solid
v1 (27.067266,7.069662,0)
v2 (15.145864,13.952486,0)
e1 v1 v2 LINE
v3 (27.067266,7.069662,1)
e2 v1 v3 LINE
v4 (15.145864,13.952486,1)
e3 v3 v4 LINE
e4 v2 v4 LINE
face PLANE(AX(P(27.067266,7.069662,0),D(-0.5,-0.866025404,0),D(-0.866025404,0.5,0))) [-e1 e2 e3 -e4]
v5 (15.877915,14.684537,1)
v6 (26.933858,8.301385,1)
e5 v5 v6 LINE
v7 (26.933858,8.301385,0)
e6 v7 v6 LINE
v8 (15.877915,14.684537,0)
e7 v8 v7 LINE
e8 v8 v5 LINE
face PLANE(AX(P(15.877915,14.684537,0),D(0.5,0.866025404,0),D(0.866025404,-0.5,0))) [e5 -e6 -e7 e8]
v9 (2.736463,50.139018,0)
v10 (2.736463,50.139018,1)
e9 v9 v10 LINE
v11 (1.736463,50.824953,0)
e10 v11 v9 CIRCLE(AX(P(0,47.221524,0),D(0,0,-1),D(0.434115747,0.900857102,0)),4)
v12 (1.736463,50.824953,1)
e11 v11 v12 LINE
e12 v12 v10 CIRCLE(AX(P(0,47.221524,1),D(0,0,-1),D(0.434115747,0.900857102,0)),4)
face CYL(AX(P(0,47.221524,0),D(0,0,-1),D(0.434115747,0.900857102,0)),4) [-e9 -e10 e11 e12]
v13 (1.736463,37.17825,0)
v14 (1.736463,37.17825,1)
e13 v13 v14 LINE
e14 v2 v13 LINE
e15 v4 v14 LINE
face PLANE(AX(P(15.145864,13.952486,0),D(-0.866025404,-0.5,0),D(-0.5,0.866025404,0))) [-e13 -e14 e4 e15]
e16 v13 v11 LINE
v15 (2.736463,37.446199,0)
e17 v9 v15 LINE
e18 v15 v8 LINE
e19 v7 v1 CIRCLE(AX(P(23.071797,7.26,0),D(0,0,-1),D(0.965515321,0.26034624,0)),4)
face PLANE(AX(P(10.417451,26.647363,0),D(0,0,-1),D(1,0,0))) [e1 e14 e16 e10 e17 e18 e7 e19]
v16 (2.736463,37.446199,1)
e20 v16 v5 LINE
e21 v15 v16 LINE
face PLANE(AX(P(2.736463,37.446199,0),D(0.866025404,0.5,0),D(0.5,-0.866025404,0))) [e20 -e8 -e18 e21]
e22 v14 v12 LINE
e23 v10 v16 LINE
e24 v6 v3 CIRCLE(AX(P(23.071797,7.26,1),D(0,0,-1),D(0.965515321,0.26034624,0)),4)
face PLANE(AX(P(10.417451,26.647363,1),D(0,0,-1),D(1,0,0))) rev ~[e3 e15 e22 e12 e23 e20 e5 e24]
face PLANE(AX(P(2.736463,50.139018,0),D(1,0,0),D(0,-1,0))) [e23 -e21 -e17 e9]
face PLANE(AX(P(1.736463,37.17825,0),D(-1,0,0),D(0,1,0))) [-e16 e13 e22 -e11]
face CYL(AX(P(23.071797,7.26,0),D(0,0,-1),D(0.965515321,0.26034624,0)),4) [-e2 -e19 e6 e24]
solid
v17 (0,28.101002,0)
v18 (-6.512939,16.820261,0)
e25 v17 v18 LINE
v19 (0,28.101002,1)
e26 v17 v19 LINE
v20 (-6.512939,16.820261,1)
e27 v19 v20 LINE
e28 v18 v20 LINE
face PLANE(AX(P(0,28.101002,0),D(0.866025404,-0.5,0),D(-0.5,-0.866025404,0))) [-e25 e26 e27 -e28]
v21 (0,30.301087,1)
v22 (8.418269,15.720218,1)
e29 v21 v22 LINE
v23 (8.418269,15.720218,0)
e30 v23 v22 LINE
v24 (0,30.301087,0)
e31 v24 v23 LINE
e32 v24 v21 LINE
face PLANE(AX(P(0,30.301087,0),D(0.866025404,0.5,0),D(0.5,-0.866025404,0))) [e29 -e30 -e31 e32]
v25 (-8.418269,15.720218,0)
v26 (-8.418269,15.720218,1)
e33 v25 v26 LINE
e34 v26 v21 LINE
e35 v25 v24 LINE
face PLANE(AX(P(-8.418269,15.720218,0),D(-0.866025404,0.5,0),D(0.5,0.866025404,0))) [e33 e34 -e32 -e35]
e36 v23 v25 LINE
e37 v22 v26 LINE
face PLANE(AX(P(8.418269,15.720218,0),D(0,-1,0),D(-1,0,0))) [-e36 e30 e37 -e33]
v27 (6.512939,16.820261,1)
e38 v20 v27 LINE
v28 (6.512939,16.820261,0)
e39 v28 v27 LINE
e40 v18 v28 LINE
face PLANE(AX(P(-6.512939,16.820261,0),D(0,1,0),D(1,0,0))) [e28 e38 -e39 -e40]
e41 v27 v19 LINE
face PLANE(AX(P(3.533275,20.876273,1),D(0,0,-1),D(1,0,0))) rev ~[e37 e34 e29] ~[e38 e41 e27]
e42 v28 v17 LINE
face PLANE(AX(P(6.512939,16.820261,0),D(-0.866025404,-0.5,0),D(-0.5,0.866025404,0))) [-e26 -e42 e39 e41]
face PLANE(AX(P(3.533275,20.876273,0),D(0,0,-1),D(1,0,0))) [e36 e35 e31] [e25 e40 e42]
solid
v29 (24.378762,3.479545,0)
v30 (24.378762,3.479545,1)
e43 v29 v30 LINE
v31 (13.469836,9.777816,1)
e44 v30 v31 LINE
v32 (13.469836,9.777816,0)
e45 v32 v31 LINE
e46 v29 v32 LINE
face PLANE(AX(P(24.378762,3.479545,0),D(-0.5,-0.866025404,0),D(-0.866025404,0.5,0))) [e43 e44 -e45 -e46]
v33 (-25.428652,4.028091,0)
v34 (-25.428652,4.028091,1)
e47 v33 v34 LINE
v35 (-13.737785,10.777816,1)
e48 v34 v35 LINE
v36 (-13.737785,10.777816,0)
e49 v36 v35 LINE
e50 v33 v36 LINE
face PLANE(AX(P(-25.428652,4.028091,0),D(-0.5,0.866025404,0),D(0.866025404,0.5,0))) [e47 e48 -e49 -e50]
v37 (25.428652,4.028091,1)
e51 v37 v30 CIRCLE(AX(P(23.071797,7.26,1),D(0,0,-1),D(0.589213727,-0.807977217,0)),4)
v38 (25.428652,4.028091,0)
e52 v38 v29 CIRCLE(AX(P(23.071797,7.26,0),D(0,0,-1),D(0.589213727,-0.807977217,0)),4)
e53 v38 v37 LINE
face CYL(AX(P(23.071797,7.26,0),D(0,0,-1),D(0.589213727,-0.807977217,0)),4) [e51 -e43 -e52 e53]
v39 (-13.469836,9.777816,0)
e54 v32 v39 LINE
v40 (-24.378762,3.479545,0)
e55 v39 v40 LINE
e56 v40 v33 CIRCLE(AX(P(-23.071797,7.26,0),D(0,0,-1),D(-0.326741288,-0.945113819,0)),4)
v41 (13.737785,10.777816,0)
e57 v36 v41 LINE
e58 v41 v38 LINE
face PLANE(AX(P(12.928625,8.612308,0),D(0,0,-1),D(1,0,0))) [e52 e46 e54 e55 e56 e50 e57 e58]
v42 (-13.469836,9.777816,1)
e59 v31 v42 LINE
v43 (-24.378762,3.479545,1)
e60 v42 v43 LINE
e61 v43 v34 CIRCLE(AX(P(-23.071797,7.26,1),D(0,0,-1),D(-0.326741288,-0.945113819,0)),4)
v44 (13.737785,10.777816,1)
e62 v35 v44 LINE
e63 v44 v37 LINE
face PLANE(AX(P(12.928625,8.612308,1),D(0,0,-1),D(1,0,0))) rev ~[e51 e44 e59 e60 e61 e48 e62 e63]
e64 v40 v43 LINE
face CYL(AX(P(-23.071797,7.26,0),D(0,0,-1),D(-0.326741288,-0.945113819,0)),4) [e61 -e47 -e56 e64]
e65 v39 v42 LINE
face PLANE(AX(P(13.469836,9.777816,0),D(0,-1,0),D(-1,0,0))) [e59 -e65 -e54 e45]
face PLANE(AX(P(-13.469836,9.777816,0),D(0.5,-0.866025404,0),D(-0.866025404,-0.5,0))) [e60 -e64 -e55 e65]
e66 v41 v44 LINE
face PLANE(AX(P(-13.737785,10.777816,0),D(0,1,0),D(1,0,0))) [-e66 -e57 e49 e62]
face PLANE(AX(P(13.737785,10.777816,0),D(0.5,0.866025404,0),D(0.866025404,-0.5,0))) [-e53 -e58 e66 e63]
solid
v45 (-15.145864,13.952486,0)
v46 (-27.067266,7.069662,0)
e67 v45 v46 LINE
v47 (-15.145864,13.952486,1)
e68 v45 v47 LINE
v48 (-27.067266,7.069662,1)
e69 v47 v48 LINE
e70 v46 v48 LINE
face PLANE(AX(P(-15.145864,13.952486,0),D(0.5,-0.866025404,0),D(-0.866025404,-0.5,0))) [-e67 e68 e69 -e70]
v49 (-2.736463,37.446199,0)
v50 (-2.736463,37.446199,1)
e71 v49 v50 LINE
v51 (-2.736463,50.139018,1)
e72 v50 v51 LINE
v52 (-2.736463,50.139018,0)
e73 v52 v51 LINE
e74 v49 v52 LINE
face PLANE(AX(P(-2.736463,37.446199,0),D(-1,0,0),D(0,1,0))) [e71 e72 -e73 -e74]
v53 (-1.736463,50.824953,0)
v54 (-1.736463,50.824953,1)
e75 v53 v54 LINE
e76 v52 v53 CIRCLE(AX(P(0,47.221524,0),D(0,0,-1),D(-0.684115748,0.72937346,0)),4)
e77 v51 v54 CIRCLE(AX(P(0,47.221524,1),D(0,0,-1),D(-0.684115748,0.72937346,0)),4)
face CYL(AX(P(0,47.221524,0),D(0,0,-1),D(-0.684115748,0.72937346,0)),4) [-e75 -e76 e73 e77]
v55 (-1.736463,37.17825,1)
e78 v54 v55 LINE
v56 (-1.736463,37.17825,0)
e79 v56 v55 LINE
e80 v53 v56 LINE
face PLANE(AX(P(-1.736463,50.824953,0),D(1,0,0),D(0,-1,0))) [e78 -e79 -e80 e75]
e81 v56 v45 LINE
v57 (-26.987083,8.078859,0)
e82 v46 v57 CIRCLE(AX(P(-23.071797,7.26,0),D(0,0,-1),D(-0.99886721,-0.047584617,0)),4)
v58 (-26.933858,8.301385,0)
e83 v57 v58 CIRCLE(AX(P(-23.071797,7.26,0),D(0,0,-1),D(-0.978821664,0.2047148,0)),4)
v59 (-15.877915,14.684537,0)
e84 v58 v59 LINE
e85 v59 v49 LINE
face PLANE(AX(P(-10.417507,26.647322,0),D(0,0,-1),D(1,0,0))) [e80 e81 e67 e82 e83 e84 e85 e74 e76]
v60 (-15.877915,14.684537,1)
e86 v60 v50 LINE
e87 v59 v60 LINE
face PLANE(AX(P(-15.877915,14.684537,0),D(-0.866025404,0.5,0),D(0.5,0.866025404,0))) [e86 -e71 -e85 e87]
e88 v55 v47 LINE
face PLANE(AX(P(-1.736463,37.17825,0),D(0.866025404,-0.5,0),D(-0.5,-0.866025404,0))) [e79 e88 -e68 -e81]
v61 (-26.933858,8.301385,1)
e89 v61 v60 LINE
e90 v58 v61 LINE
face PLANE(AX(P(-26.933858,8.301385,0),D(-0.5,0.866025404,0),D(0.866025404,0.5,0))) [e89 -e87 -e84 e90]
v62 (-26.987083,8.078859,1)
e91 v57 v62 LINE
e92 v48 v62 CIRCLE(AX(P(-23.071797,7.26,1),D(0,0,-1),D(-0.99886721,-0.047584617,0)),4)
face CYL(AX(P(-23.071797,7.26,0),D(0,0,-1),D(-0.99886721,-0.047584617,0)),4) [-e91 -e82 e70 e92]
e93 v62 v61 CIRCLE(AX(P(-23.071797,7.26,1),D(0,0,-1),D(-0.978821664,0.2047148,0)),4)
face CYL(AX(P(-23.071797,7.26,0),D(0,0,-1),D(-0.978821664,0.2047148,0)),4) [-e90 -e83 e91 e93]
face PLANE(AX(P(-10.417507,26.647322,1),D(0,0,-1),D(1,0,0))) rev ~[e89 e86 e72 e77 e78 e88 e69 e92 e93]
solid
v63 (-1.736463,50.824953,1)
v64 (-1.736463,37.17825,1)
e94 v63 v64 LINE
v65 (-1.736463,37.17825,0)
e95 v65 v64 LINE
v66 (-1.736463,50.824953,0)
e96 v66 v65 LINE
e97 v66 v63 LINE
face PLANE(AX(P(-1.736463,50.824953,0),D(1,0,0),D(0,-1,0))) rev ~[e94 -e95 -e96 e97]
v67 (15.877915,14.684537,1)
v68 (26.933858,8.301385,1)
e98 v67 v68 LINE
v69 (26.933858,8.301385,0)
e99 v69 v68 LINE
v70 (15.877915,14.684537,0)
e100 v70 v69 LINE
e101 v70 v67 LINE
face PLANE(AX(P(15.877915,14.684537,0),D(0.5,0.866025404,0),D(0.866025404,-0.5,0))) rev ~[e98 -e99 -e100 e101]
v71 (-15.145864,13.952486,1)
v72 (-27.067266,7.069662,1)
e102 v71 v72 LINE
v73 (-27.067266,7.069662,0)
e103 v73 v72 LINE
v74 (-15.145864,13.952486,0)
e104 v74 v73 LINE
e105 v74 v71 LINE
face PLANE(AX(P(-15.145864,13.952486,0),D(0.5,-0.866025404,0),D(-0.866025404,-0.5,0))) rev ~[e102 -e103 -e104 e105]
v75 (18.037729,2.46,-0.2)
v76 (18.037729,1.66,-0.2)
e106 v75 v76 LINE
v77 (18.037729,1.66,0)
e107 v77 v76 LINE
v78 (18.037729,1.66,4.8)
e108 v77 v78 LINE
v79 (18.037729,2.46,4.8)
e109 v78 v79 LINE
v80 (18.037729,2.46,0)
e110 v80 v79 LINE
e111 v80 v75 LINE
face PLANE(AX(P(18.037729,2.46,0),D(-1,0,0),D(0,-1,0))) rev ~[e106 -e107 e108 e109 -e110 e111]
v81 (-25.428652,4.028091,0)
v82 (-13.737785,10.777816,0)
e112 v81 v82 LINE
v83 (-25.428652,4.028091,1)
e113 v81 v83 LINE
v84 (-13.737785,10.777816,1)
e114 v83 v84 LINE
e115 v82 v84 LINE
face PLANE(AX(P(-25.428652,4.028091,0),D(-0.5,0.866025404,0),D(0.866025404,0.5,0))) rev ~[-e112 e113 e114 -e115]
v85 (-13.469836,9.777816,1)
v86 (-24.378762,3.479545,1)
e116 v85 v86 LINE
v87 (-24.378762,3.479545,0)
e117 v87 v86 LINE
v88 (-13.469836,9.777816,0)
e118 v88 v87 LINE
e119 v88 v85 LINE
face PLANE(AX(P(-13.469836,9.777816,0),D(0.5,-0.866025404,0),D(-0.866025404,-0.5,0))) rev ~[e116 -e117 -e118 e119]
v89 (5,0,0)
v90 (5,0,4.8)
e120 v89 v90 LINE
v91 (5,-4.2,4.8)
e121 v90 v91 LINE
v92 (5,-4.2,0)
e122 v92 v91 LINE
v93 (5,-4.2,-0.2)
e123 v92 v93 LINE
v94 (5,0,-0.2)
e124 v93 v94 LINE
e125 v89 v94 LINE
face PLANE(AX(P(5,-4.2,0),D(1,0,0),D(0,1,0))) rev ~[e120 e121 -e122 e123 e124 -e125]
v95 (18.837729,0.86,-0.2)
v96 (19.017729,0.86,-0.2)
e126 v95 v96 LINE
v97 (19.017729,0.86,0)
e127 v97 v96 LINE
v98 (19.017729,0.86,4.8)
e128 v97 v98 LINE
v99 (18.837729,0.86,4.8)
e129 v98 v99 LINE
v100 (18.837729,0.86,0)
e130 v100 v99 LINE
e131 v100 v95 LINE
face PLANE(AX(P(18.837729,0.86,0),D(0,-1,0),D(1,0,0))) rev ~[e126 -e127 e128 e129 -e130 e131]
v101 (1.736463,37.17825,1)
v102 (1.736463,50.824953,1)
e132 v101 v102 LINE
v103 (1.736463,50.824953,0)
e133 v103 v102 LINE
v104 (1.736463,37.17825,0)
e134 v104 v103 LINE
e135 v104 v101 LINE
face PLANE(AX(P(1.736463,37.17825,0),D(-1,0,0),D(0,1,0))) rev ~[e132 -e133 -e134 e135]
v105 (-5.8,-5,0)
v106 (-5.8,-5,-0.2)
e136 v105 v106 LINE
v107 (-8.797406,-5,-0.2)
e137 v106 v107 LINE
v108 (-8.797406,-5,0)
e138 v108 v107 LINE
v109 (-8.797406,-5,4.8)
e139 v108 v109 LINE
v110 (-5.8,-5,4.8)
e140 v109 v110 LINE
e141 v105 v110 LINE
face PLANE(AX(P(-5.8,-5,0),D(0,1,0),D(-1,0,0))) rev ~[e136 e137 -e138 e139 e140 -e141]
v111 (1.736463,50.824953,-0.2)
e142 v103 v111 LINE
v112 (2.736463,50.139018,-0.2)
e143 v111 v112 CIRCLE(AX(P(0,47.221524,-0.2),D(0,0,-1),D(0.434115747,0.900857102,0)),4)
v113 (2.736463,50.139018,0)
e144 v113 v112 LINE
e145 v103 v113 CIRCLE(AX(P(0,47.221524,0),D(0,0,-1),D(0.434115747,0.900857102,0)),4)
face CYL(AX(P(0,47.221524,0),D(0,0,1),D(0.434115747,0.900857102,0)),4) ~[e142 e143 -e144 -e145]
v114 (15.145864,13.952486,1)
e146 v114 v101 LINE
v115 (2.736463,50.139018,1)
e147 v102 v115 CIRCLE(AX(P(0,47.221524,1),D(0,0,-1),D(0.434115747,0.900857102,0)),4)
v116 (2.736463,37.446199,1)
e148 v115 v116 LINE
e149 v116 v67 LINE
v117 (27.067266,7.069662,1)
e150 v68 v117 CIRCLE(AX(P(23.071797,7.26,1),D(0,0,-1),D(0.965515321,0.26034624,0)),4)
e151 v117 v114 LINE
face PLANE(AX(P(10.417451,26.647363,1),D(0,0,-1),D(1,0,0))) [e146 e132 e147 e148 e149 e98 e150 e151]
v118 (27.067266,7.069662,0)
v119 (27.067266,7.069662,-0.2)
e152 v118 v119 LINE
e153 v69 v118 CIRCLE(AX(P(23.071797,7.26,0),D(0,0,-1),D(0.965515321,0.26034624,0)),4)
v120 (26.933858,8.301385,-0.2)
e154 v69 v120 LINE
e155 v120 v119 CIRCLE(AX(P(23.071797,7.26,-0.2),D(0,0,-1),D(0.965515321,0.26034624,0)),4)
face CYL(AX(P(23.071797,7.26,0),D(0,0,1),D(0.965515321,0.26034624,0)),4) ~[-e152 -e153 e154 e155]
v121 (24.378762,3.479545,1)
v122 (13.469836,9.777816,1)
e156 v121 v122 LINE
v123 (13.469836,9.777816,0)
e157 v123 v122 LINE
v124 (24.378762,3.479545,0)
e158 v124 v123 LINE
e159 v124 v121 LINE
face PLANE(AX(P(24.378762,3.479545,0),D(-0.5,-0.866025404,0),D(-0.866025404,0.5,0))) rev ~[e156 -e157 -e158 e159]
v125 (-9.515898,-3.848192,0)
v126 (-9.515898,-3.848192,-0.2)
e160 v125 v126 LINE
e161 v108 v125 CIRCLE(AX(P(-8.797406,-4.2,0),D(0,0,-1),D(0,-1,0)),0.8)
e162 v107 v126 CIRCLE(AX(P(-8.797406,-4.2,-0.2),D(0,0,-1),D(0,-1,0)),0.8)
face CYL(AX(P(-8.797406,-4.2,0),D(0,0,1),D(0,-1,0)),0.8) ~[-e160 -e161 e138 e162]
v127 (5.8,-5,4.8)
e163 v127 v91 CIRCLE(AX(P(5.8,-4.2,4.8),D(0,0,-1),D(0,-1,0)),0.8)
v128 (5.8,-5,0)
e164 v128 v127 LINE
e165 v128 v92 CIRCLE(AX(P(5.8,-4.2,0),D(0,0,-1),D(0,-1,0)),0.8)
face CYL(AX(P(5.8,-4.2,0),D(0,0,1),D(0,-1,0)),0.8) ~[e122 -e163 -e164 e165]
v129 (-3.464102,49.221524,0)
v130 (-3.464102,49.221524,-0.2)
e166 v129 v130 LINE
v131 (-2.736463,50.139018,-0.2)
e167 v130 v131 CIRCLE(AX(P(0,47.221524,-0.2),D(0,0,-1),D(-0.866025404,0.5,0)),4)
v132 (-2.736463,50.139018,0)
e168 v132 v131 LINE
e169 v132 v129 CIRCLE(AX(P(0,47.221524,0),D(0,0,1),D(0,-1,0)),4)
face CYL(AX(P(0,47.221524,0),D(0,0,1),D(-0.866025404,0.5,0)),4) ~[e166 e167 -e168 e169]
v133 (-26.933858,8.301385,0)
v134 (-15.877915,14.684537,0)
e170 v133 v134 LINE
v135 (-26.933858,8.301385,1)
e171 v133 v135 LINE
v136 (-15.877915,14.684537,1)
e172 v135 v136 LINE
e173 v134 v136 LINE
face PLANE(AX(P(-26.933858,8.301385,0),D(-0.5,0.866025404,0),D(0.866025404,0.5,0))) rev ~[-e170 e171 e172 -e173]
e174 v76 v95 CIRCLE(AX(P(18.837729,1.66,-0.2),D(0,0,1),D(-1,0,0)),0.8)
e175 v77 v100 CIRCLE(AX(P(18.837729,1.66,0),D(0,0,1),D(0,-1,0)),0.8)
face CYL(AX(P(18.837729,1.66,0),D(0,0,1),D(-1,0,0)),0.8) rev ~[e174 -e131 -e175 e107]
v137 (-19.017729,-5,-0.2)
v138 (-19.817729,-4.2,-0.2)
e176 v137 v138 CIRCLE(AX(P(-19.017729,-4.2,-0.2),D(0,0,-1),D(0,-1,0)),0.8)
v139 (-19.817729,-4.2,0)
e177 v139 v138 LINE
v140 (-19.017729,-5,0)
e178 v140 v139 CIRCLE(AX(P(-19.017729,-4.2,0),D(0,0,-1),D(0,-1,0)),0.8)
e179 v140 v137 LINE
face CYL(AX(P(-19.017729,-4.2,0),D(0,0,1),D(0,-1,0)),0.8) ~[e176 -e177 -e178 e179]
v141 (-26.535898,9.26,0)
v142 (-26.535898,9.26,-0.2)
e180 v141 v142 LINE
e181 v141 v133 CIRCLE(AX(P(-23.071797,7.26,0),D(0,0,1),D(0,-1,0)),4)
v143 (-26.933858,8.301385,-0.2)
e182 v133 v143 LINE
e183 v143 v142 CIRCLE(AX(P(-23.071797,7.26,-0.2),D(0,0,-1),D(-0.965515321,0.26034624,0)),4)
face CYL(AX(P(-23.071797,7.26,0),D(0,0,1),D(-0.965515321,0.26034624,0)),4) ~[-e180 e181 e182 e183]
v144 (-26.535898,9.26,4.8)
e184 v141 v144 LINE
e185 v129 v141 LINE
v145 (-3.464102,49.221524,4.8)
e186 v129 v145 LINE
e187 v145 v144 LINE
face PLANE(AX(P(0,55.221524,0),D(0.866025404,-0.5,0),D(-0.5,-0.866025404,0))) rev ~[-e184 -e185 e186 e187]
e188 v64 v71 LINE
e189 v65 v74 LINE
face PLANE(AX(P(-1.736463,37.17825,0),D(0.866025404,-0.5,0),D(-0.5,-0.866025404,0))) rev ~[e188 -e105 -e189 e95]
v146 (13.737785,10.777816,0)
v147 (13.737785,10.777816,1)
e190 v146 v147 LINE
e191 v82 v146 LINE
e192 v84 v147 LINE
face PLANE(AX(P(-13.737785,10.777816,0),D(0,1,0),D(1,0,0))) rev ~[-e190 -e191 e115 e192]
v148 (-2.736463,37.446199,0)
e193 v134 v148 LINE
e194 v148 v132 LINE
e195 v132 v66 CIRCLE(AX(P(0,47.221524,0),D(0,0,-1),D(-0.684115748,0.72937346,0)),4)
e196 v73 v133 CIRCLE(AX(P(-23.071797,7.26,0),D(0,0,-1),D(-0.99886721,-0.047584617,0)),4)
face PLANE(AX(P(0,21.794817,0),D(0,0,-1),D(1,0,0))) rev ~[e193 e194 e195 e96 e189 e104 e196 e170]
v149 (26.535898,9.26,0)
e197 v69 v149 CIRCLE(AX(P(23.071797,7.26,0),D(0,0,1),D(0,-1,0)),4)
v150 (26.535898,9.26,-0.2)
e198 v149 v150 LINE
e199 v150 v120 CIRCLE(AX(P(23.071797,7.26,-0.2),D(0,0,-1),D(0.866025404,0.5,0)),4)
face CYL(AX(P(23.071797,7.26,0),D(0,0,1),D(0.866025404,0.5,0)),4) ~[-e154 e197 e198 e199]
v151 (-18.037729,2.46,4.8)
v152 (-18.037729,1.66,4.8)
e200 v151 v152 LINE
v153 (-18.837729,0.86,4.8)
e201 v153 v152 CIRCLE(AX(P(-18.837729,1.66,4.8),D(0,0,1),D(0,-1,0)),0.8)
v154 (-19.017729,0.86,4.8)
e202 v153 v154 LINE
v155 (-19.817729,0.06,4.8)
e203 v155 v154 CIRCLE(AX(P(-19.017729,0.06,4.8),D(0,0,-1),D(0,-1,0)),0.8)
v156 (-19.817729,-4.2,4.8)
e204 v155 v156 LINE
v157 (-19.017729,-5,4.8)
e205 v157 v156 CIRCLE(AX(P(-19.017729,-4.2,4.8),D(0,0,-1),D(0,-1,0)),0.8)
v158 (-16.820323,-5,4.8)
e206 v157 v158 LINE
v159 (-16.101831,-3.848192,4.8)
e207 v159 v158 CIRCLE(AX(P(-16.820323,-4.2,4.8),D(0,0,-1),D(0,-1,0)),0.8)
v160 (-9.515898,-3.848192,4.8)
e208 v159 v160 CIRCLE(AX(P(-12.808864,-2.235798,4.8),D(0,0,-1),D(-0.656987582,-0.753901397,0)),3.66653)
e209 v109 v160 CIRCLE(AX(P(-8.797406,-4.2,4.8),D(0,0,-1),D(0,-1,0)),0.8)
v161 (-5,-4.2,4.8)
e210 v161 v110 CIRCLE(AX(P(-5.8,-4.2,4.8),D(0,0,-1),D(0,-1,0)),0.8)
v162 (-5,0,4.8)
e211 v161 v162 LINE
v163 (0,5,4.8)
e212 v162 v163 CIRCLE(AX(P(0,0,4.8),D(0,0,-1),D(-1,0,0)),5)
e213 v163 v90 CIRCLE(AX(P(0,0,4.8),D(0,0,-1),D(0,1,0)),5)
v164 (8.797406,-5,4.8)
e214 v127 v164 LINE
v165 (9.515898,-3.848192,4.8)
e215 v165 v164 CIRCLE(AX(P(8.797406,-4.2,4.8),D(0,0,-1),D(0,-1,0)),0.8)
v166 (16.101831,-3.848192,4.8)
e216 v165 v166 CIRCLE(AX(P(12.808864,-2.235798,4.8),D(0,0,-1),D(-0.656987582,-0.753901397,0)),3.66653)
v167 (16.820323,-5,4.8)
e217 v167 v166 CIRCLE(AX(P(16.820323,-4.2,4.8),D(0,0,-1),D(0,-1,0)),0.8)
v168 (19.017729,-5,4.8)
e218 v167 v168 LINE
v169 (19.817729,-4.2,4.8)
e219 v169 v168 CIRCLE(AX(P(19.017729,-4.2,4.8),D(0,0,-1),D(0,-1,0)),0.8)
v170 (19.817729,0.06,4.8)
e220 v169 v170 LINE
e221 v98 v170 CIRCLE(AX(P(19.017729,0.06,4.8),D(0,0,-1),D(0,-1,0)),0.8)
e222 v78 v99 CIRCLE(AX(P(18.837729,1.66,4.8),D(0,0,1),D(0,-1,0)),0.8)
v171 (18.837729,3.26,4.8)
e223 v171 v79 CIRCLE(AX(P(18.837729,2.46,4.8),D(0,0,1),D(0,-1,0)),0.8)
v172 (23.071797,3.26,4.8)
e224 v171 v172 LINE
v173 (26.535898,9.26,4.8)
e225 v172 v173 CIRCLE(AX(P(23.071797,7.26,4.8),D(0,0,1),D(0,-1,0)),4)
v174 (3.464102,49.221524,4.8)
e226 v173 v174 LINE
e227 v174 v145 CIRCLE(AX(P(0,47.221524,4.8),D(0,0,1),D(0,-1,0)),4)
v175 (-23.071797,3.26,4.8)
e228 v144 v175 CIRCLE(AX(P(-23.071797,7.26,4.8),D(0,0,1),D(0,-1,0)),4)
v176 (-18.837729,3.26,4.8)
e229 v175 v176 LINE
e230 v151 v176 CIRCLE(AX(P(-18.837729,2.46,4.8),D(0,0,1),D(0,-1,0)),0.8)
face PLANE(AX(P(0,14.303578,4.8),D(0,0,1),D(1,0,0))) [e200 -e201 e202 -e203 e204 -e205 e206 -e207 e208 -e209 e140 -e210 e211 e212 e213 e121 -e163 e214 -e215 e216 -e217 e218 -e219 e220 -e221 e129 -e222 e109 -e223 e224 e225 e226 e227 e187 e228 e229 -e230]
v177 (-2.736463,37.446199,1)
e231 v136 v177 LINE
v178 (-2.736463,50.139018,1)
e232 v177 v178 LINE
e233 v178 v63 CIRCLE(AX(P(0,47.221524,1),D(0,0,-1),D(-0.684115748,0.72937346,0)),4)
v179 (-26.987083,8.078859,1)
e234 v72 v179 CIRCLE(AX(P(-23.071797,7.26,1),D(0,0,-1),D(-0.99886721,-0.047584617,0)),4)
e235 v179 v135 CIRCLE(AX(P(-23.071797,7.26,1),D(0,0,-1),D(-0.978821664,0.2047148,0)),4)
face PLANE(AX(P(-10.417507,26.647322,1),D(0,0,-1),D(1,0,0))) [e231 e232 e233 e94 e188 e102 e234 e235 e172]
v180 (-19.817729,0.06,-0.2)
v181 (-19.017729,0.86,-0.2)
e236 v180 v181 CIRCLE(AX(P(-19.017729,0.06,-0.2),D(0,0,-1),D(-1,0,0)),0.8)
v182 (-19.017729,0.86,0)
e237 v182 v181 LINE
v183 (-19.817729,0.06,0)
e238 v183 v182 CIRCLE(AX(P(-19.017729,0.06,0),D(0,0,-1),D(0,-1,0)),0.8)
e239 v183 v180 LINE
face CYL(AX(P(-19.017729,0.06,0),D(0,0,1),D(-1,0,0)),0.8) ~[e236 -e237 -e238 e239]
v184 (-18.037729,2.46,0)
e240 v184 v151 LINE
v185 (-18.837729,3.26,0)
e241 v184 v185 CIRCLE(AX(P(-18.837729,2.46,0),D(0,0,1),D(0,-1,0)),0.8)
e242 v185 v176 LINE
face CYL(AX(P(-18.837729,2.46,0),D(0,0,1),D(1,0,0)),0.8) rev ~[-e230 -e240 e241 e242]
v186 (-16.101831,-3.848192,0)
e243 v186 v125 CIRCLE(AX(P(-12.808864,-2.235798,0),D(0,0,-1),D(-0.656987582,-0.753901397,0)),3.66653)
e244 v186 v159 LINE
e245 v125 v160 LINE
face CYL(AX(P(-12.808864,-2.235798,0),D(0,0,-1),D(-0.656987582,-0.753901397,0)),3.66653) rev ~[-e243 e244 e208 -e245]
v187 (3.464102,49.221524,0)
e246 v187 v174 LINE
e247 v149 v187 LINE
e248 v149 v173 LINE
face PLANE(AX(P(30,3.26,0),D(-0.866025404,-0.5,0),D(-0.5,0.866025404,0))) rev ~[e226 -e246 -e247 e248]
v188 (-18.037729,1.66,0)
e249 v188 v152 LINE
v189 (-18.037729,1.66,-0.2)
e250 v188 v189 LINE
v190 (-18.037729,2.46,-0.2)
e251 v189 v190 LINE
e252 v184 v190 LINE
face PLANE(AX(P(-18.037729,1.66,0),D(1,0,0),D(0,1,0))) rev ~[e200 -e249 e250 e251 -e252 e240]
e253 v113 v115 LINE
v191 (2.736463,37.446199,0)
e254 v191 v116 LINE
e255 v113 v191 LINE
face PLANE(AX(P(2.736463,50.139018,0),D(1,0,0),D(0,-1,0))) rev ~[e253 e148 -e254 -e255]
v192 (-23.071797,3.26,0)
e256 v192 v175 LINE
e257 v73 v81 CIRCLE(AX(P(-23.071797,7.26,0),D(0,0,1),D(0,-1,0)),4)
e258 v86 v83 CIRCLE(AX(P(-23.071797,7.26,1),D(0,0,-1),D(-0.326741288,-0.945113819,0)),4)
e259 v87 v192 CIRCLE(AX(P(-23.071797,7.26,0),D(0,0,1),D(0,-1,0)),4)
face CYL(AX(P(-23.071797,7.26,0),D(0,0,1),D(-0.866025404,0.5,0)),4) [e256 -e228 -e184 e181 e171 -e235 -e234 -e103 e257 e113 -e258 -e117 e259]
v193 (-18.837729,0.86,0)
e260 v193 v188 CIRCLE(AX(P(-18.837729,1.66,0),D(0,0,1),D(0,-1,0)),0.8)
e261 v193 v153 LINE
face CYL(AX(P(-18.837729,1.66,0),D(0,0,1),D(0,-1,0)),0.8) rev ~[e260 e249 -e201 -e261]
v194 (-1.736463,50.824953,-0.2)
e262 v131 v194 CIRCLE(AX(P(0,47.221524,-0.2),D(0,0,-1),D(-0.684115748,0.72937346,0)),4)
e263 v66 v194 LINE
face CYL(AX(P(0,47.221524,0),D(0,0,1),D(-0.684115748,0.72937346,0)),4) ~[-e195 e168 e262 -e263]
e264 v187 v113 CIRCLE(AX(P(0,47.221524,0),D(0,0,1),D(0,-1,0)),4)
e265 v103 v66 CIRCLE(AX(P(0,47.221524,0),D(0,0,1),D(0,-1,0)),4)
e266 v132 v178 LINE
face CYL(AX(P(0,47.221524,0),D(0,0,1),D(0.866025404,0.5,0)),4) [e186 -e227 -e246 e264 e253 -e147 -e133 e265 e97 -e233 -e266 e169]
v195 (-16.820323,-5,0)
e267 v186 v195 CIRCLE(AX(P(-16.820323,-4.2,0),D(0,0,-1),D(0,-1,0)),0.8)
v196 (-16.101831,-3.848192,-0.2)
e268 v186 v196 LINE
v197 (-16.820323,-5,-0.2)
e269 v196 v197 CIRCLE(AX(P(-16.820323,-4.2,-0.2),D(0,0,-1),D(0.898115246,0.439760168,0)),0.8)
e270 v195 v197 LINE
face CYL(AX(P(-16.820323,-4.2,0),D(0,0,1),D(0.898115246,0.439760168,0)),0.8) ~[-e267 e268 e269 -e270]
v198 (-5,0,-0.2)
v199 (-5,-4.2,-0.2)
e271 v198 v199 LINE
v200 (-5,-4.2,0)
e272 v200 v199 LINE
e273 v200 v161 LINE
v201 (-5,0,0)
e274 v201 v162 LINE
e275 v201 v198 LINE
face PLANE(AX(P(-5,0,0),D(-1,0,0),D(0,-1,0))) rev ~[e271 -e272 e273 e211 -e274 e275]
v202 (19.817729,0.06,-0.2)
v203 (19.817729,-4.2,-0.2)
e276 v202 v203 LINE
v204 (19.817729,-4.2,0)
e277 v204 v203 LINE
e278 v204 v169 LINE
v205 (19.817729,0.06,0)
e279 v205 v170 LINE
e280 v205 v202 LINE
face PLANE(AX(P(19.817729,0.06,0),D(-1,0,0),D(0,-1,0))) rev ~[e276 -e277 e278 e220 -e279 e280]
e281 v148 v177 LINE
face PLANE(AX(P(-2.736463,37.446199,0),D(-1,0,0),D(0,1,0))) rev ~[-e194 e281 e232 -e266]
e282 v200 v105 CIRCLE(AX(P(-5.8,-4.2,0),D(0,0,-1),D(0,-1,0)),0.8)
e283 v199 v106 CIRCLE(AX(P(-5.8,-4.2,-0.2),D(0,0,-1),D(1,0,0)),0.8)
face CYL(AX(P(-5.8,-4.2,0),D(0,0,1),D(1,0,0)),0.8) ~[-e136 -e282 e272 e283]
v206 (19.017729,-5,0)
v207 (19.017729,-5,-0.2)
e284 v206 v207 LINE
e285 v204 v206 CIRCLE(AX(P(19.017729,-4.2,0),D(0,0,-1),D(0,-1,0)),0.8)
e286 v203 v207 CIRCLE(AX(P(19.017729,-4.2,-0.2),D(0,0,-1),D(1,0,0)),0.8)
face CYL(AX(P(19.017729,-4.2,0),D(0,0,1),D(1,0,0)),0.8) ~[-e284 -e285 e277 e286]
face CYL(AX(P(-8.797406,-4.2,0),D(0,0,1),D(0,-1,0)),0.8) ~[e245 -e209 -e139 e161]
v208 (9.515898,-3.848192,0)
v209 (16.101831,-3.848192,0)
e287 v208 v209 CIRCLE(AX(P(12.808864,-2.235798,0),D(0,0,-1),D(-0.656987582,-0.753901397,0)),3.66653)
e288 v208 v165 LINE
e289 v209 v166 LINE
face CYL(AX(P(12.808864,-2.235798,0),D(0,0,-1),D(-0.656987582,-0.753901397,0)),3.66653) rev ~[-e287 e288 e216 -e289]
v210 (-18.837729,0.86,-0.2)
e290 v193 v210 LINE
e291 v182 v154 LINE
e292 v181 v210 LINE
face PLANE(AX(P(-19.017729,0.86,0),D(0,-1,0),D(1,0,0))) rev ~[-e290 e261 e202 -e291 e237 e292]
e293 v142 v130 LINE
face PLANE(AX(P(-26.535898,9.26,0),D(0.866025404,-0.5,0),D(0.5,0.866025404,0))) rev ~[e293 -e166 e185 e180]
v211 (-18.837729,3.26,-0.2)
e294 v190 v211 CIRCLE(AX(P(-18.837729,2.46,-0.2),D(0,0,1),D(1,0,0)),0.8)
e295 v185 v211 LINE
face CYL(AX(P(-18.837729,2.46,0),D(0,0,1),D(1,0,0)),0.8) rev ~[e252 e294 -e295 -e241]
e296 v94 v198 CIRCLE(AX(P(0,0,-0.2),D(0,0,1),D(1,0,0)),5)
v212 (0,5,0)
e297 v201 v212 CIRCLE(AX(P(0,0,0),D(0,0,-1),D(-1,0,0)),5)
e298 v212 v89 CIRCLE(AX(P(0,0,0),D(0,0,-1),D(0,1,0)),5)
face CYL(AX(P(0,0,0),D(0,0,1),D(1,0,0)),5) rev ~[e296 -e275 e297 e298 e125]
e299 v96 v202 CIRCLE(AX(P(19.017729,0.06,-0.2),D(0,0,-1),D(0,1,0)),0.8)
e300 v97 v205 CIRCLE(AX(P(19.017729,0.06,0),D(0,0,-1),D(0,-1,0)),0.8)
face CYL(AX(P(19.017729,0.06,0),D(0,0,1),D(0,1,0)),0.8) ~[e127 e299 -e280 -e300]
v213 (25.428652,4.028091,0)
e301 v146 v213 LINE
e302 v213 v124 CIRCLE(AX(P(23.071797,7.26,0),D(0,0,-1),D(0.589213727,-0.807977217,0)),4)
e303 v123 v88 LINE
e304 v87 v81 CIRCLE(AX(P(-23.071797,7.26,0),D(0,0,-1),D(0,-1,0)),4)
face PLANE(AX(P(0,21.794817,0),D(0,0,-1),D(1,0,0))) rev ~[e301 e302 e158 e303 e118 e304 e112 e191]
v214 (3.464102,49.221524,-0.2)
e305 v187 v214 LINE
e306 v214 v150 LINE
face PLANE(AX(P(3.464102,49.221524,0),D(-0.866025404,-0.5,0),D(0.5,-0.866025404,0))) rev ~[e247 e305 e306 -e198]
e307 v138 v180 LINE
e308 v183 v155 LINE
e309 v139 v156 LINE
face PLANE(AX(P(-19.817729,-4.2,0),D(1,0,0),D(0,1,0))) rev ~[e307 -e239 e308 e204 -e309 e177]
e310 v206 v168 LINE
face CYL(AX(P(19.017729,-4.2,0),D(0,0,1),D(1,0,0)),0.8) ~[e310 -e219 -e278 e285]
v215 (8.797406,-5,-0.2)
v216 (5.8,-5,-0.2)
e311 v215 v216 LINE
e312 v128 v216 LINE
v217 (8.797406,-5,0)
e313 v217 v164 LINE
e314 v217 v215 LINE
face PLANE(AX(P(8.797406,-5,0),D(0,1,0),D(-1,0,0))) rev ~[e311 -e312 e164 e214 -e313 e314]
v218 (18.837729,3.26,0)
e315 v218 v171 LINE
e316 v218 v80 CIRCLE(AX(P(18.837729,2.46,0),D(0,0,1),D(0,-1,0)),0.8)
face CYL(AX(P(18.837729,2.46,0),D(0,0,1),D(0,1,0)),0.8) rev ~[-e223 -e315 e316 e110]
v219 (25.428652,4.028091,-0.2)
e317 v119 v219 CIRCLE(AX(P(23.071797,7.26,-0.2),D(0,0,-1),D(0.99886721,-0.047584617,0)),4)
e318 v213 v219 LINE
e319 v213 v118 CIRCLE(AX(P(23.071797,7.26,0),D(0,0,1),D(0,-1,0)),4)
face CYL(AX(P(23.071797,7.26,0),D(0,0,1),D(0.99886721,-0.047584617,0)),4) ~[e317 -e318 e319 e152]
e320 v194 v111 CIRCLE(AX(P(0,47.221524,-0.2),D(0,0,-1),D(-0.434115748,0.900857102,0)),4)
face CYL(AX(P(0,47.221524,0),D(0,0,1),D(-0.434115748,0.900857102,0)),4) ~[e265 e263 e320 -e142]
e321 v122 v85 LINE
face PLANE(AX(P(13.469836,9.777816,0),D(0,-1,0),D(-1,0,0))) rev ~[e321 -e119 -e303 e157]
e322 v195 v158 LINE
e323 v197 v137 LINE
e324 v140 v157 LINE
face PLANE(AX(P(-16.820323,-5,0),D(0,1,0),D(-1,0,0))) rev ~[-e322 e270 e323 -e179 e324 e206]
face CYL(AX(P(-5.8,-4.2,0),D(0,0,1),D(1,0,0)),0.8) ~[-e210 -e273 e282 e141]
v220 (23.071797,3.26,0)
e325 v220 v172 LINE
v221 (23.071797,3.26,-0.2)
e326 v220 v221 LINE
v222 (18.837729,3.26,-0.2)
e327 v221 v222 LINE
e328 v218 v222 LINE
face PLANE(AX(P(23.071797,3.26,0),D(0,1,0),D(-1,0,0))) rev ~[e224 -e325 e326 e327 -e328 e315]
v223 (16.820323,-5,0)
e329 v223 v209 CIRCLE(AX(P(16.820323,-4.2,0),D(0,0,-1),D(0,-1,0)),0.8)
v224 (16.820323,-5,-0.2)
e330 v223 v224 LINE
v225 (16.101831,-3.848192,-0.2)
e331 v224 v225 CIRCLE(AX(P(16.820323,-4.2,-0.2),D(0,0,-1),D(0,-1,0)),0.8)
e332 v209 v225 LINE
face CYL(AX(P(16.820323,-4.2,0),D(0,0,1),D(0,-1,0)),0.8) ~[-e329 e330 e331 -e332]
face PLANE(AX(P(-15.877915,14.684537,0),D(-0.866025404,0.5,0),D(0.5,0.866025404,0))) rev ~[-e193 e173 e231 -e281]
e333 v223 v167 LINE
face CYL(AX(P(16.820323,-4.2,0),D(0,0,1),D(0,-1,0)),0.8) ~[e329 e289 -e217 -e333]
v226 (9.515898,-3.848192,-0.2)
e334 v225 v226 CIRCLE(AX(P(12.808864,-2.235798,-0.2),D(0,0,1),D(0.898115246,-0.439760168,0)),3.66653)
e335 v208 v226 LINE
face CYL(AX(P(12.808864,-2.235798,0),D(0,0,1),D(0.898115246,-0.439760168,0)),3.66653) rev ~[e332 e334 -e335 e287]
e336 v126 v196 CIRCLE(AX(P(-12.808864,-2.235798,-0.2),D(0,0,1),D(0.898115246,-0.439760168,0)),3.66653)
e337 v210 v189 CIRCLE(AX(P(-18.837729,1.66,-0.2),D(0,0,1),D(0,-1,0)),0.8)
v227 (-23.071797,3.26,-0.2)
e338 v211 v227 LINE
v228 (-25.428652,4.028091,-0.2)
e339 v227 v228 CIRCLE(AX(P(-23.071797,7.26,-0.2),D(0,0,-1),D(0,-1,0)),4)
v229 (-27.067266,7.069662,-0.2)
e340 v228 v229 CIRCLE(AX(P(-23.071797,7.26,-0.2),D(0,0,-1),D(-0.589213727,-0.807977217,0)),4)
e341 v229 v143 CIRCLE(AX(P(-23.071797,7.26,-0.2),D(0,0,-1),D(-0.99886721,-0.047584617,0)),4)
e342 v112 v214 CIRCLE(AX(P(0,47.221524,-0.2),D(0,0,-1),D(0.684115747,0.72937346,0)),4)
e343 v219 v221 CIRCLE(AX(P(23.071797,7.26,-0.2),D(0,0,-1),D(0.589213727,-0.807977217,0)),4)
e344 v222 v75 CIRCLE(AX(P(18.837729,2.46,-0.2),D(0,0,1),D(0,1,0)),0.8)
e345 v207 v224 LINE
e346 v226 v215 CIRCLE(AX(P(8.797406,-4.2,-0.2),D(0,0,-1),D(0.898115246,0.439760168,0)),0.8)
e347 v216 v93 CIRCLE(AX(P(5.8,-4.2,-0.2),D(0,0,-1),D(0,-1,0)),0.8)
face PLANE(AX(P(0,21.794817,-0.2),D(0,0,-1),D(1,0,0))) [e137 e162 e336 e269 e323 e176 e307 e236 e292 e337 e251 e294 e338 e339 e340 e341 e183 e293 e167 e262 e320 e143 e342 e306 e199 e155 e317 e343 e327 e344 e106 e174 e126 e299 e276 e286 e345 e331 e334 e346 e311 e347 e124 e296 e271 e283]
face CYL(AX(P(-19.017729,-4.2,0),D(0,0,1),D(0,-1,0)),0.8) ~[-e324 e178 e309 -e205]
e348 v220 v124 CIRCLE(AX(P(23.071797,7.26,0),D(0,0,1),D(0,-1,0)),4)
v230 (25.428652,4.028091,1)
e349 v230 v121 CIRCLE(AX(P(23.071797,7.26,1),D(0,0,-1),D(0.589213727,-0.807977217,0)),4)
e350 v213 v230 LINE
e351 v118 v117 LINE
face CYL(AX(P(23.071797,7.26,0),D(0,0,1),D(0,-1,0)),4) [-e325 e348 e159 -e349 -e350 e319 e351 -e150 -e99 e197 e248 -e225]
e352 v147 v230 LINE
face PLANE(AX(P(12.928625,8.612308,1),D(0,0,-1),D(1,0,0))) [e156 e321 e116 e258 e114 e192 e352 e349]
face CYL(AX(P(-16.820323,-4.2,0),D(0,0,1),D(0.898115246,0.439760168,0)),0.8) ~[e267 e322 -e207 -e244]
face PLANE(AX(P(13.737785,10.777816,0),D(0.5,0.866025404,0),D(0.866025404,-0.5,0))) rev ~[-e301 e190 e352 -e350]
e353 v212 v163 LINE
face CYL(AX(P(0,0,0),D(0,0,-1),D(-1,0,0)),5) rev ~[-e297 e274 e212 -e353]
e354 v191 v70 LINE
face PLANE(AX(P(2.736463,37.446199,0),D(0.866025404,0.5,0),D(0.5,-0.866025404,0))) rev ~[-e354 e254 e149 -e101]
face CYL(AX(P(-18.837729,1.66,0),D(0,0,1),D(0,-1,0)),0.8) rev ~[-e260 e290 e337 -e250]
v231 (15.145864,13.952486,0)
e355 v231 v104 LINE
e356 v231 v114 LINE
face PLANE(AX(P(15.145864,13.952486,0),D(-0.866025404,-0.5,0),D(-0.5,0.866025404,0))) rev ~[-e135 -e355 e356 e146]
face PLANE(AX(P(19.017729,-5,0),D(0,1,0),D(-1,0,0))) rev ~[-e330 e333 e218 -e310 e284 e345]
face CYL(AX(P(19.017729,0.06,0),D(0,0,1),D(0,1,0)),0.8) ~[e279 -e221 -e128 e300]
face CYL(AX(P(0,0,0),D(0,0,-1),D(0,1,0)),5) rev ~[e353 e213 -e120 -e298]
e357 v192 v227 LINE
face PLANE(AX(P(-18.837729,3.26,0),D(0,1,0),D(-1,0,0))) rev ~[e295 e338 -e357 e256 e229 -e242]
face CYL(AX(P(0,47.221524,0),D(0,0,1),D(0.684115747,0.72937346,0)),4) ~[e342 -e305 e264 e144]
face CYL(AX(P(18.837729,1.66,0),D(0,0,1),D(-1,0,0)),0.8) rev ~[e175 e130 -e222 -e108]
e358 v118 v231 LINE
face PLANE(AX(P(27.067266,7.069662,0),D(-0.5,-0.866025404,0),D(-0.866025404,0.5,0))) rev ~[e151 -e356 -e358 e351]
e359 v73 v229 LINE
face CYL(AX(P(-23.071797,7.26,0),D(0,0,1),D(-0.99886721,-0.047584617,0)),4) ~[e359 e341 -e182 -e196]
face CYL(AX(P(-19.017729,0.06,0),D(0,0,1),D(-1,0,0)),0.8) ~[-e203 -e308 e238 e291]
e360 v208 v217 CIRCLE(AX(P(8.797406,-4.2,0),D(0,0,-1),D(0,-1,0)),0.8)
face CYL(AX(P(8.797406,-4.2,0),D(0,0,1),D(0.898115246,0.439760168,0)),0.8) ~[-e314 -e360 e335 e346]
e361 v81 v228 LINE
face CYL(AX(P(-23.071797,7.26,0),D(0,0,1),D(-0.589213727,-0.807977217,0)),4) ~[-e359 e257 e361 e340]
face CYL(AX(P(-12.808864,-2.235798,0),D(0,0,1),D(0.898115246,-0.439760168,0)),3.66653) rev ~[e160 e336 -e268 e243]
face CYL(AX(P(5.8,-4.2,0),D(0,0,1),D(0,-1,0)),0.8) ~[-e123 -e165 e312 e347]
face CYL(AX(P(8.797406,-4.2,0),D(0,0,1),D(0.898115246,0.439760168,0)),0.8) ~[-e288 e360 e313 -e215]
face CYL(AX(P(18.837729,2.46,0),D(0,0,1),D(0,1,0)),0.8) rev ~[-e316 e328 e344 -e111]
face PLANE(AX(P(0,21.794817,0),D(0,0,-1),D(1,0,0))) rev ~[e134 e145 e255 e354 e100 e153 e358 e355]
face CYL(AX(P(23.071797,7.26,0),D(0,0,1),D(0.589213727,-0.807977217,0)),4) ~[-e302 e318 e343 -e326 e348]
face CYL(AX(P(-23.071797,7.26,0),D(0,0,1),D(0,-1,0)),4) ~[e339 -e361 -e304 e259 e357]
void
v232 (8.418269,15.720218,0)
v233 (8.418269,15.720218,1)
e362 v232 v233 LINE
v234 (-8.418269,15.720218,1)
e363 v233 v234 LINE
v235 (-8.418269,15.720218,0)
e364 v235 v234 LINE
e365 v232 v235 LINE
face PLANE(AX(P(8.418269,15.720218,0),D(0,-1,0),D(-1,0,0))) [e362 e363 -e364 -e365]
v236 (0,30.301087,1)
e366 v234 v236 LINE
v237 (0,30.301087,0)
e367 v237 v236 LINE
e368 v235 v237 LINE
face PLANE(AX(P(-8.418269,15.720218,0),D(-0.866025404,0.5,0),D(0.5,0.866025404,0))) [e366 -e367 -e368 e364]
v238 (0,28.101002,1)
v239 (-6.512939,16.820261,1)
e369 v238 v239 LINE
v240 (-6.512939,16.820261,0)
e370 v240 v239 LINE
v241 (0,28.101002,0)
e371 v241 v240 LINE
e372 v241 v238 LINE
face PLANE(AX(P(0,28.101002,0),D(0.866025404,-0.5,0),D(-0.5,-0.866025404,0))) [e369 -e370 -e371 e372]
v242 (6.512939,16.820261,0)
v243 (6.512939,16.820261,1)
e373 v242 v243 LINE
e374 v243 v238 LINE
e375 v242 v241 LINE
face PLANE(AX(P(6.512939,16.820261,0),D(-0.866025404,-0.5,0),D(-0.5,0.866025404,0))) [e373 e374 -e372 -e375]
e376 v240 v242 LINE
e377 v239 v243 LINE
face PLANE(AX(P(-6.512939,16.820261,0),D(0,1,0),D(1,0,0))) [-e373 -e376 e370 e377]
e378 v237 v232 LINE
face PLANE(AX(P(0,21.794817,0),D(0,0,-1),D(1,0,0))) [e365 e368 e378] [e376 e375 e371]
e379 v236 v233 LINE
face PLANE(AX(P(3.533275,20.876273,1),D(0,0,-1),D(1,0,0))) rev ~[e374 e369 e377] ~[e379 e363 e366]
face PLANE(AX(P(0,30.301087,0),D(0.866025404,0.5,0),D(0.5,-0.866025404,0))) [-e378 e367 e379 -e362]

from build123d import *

# Parameters (mm, degrees)
F1_DEPTH = 4.8
F2_R     = 4
F4_DEPTH = 1
F5_DEPTH = 1
F6_R     = 0.8
F8_DEPTH = 0.2


# Not quite as in the source:
# - after a boolean that leaves OpenCascade's solid faulty, fix() repairs it


with BuildPart() as f1:
    # F0 (on Top) → F1 (new body)
    with BuildSketch(Plane.XY):
        with BuildLine():
            ThreePointArc((-5, 0), (-3.5355339059, 3.5355339059), (0, 5))
            ThreePointArc((0, 5), (3.5355339059, 3.5355339059), (5, 0))
            Line((5, 0), (5, -5))
            Line((5, -5), (10.4, -5))
            ThreePointArc((10.4, -5), (12.8088644564, 1.4307314955), (15.2177289128, -5))
            Line((15.2177289128, -5), (19.8177289128, -5))
            Line((19.8177289128, -5), (19.8177289128, 0.86))
            Line((19.8177289128, 0.86), (18.0377289128, 0.86))
            Line((18.0377289128, 0.86), (18.0377289128, 3.26))
            Line((18.0377289128, 3.26), (30, 3.26))
            Line((30, 3.26), (0, 55.2215242271))
            Line((0, 55.2215242271), (-30, 3.26))
            Line((-30, 3.26), (-18.0377289128, 3.26))
            Line((-18.0377289128, 3.26), (-18.0377289128, 0.86))
            Line((-18.0377289128, 0.86), (-19.8177289128, 0.86))
            Line((-19.8177289128, 0.86), (-19.8177289128, -5))
            Line((-19.8177289128, -5), (-15.2177289128, -5))
            ThreePointArc((-15.2177289128, -5), (-12.8088644564, 1.4307314955), (-10.4, -5))
            Line((-10.4, -5), (-5, -5))
            Line((-5, -5), (-5, 0))
        make_face()
    extrude(amount=F1_DEPTH)

    # F2
    f2_edges = [f1.edges().sort_by_distance(p)[0] for p in [
        (30, 3.26, 2.4),
        (0, 55.221524, 2.4),
        (-30, 3.26, 2.4),
    ]]
    fillet(f2_edges, radius=F2_R)

    # F3 (on face) → F4 (cut)
    with BuildSketch(Plane(origin=(0, 0, 0), x_dir=(1, 0, 0), z_dir=(0, 0, -1))):
        with BuildLine():
            Line((0, -9.7778161764), (0, -10.7778161764))
            Line((0, -10.7778161764), (13.737784962, -10.7778161764))
            Line((13.737784962, -10.7778161764), (25.4286516784, -4.0280911307))
            ThreePointArc((25.4286516784, -4.0280911307), (24.9241250755, -3.714738395), (24.3787619235, -3.4795447249))
            Line((24.3787619235, -3.4795447249), (13.4698357696, -9.7778161764))
            Line((13.4698357696, -9.7778161764), (0, -9.7778161764))
        make_face()
        with BuildLine():
            Line((-13.737784962, -10.7778161764), (0, -10.7778161764))
            Line((0, -10.7778161764), (0, -9.7778161764))
            Line((0, -9.7778161764), (-13.4698357696, -9.7778161764))
            Line((-13.4698357696, -9.7778161764), (-24.3787619235, -3.4795447249))
            ThreePointArc((-24.3787619235, -3.4795447249), (-24.9241250755, -3.714738395), (-25.4286516784, -4.0280911307))
            Line((-25.4286516784, -4.0280911307), (-13.737784962, -10.7778161764))
        make_face()
        with BuildLine():
            Line((1.7364629899, -37.1782497502), (1.7364629899, -50.8249526341))
            ThreePointArc((1.7364629899, -50.8249526341), (2.2626076246, -50.5201006984), (2.7364629899, -50.1390180668))
            Line((2.7364629899, -50.1390180668), (2.7364629899, -37.4461989427))
            Line((2.7364629899, -37.4461989427), (15.8779147563, -14.6845367981))
            Line((15.8779147563, -14.6845367981), (26.9338580546, -8.3013849587))
            ThreePointArc((26.9338580546, -8.3013849587), (27.0485392273, -7.6907196607), (27.0672656117, -7.0696615313))
            Line((27.0672656117, -7.0696615313), (15.1458639487, -13.9524859905))
            Line((15.1458639487, -13.9524859905), (1.7364629899, -37.1782497502))
        make_face()
        Polygon((8.4182686231, -15.72021842), (0, -15.72021842), (0, -16.8202612549), (6.5129385426, -16.8202612549), (0, -28.1010017173), (0, -30.301087387), align=None)
        Polygon((0, -16.8202612549), (0, -15.72021842), (-8.4182686231, -15.72021842), (0, -30.301087387), (0, -28.1010017173), (-6.5129385426, -16.8202612549), align=None)
        with BuildLine():
            Line((-15.1458639487, -13.9524859905), (-27.0672656117, -7.0696615313))
            ThreePointArc((-27.0672656117, -7.0696615313), (-27.0592311738, -7.5768073123), (-26.9870834272, -8.0788592001))
            ThreePointArc((-26.9870834272, -8.0788592001), (-26.962062144, -8.1905027231), (-26.9338580546, -8.3013849587))
            Line((-26.9338580546, -8.3013849587), (-15.8779147563, -14.6845367981))
            Line((-15.8779147563, -14.6845367981), (-2.7364629899, -37.4461989427))
            Line((-2.7364629899, -37.4461989427), (-2.7364629899, -50.1390180668))
            ThreePointArc((-2.7364629899, -50.1390180668), (-2.2626076246, -50.5201006984), (-1.7364629899, -50.8249526341))
            Line((-1.7364629899, -50.8249526341), (-1.7364629899, -37.1782497502))
            Line((-1.7364629899, -37.1782497502), (-15.1458639487, -13.9524859905))
        make_face()
    extrude(amount=-F4_DEPTH, mode=Mode.SUBTRACT)

    # F6
    f6_edges = [f1.edges().sort_by_distance(p)[0] for p in [
        (18.037729, 3.26, 2.4),
        (18.037729, 0.86, 2.4),
        (19.817729, 0.86, 2.4),
        (19.817729, -5, 2.4),
        (15.217729, -5, 2.4),
        (10.4, -5, 2.4),
        (5, -5, 2.4),
        (-5, -5, 2.4),
        (-10.4, -5, 2.4),
        (-15.217729, -5, 2.4),
        (-19.817729, -5, 2.4),
        (-19.817729, 0.86, 2.4),
        (-18.037729, 0.86, 2.4),
        (-18.037729, 3.26, 2.4),
    ]]
    fillet(f6_edges, radius=F6_R)

    # F7 (on face) → F8 (join)
    with BuildSketch(Plane(origin=(0, 0, 0), x_dir=(1, 0, 0), z_dir=(0, 0, -1))):
        with BuildLine():
            Line((3.4641016151, -49.2215242271), (26.5358983849, -9.26))
            ThreePointArc((26.5358983849, -9.26), (26.7661033905, -8.793655304), (26.9338580546, -8.3013849587))
            ThreePointArc((26.9338580546, -8.3013849587), (27.0485392273, -7.6907196607), (27.0672656117, -7.0696615313))
            ThreePointArc((27.0672656117, -7.0696615313), (26.5932725802, -5.3628420951), (25.4286516784, -4.0280911307))
            ThreePointArc((25.4286516784, -4.0280911307), (24.9241250755, -3.714738395), (24.3787619235, -3.4795447249))
            Line((24.3787619235, -3.4795447249), (13.4698357696, -9.7778161764))
            Line((13.4698357696, -9.7778161764), (-13.4698357696, -9.7778161764))
            Line((-13.4698357696, -9.7778161764), (-24.3787619235, -3.4795447249))
            ThreePointArc((-24.3787619235, -3.4795447249), (-24.9241250755, -3.714738395), (-25.4286516784, -4.0280911307))
            ThreePointArc((-25.4286516784, -4.0280911307), (-26.5932725802, -5.3628420951), (-27.0672656117, -7.0696615313))
            ThreePointArc((-27.0672656117, -7.0696615313), (-27.0485392273, -7.6907196607), (-26.9338580546, -8.3013849587))
            ThreePointArc((-26.9338580546, -8.3013849587), (-26.7661033905, -8.793655304), (-26.5358983849, -9.26))
            Line((-26.5358983849, -9.26), (-3.4641016151, -49.2215242271))
            ThreePointArc((-3.4641016151, -49.2215242271), (-3.1340387828, -49.7070424644), (-2.7364629899, -50.1390180668))
            ThreePointArc((-2.7364629899, -50.1390180668), (-2.2626076246, -50.5201006984), (-1.7364629899, -50.8249526341))
            ThreePointArc((-1.7364629899, -50.8249526341), (0, -51.2215242271), (1.7364629899, -50.8249526341))
            ThreePointArc((1.7364629899, -50.8249526341), (2.2626076246, -50.5201006984), (2.7364629899, -50.1390180668))
            ThreePointArc((2.7364629899, -50.1390180668), (3.1340387828, -49.7070424644), (3.4641016151, -49.2215242271))
        make_face()
        with BuildLine():
            Line((13.4698357696, -9.7778161764), (24.3787619235, -3.4795447249))
            ThreePointArc((24.3787619235, -3.4795447249), (23.7344350193, -3.3152680002), (23.0717967697, -3.26))
            Line((23.0717967697, -3.26), (18.8377289128, -3.26))
            ThreePointArc((18.8377289128, -3.26), (18.2720434879, -3.0256854249), (18.0377289128, -2.46))
            Line((18.0377289128, -2.46), (18.0377289128, -1.66))
            ThreePointArc((18.0377289128, -1.66), (18.2720434879, -1.0943145751), (18.8377289128, -0.86))
            Line((18.8377289128, -0.86), (19.0177289128, -0.86))
            ThreePointArc((19.0177289128, -0.86), (19.5834143378, -0.6256854249), (19.8177289128, -0.06))
            Line((19.8177289128, -0.06), (19.8177289128, 4.2))
            ThreePointArc((19.8177289128, 4.2), (19.5834143378, 4.7656854249), (19.0177289128, 5))
            Line((19.0177289128, 5), (16.8203228399, 5))
            ThreePointArc((16.8203228399, 5), (16.1415568612, 4.623410848), (16.1018306433, 3.8481918655))
            ThreePointArc((16.1018306433, 3.8481918655), (12.8088644564, -1.4307314955), (9.5158982695, 3.8481918655))
            ThreePointArc((9.5158982695, 3.8481918655), (9.4761720516, 4.623410848), (8.797406073, 5))
            Line((8.797406073, 5), (5.8, 5))
            ThreePointArc((5.8, 5), (5.2343145751, 4.7656854249), (5, 4.2))
            Line((5, 4.2), (5, 0))
            ThreePointArc((5, 0), (0, -5), (-5, 0))
            Line((-5, 0), (-5, 4.2))
            ThreePointArc((-5, 4.2), (-5.2343145751, 4.7656854249), (-5.8, 5))
            Line((-5.8, 5), (-8.797406073, 5))
            ThreePointArc((-8.797406073, 5), (-9.4761720516, 4.623410848), (-9.5158982695, 3.8481918655))
            ThreePointArc((-9.5158982695, 3.8481918655), (-12.8088644564, -1.4307314955), (-16.1018306433, 3.8481918655))
            ThreePointArc((-16.1018306433, 3.8481918655), (-16.1415568612, 4.623410848), (-16.8203228399, 5))
            Line((-16.8203228399, 5), (-19.0177289128, 5))
            ThreePointArc((-19.0177289128, 5), (-19.5834143378, 4.7656854249), (-19.8177289128, 4.2))
            Line((-19.8177289128, 4.2), (-19.8177289128, -0.06))
            ThreePointArc((-19.8177289128, -0.06), (-19.5834143378, -0.6256854249), (-19.0177289128, -0.86))
            Line((-19.0177289128, -0.86), (-18.8377289128, -0.86))
            ThreePointArc((-18.8377289128, -0.86), (-18.2720434879, -1.0943145751), (-18.0377289128, -1.66))
            Line((-18.0377289128, -1.66), (-18.0377289128, -2.46))
            ThreePointArc((-18.0377289128, -2.46), (-18.2720434879, -3.0256854249), (-18.8377289128, -3.26))
            Line((-18.8377289128, -3.26), (-23.0717967697, -3.26))
            ThreePointArc((-23.0717967697, -3.26), (-23.7344350193, -3.3152680002), (-24.3787619235, -3.4795447249))
            Line((-24.3787619235, -3.4795447249), (-13.4698357696, -9.7778161764))
            Line((-13.4698357696, -9.7778161764), (13.4698357696, -9.7778161764))
        make_face()
    extrude(amount=F8_DEPTH)

    add(f1.part.fix(), mode=Mode.REPLACE)


with BuildPart() as f5:
    # F3 (on face) → F5 (new body)
    with BuildSketch(Plane(origin=(0, 0, 0), x_dir=(1, 0, 0), z_dir=(0, 0, -1))):
        with BuildLine():
            Line((0, -9.7778161764), (0, -10.7778161764))
            Line((0, -10.7778161764), (13.737784962, -10.7778161764))
            Line((13.737784962, -10.7778161764), (25.4286516784, -4.0280911307))
            ThreePointArc((25.4286516784, -4.0280911307), (24.9241250755, -3.714738395), (24.3787619235, -3.4795447249))
            Line((24.3787619235, -3.4795447249), (13.4698357696, -9.7778161764))
            Line((13.4698357696, -9.7778161764), (0, -9.7778161764))
        make_face()
        with BuildLine():
            Line((-13.737784962, -10.7778161764), (0, -10.7778161764))
            Line((0, -10.7778161764), (0, -9.7778161764))
            Line((0, -9.7778161764), (-13.4698357696, -9.7778161764))
            Line((-13.4698357696, -9.7778161764), (-24.3787619235, -3.4795447249))
            ThreePointArc((-24.3787619235, -3.4795447249), (-24.9241250755, -3.714738395), (-25.4286516784, -4.0280911307))
            Line((-25.4286516784, -4.0280911307), (-13.737784962, -10.7778161764))
        make_face()
    extrude(amount=-F5_DEPTH)


with BuildPart() as f5b:
    # F3 (on face) → F5, piece 2 (new body)
    with BuildSketch(Plane(origin=(0, 0, 0), x_dir=(1, 0, 0), z_dir=(0, 0, -1))):
        with BuildLine():
            Line((1.7364629899, -37.1782497502), (1.7364629899, -50.8249526341))
            ThreePointArc((1.7364629899, -50.8249526341), (2.2626076246, -50.5201006984), (2.7364629899, -50.1390180668))
            Line((2.7364629899, -50.1390180668), (2.7364629899, -37.4461989427))
            Line((2.7364629899, -37.4461989427), (15.8779147563, -14.6845367981))
            Line((15.8779147563, -14.6845367981), (26.9338580546, -8.3013849587))
            ThreePointArc((26.9338580546, -8.3013849587), (27.0485392273, -7.6907196607), (27.0672656117, -7.0696615313))
            Line((27.0672656117, -7.0696615313), (15.1458639487, -13.9524859905))
            Line((15.1458639487, -13.9524859905), (1.7364629899, -37.1782497502))
        make_face()
    extrude(amount=-F5_DEPTH)


with BuildPart() as f5c:
    # F3 (on face) → F5, piece 3 (new body)
    with BuildSketch(Plane(origin=(0, 0, 0), x_dir=(1, 0, 0), z_dir=(0, 0, -1))):
        Polygon((8.4182686231, -15.72021842), (0, -15.72021842), (0, -16.8202612549), (6.5129385426, -16.8202612549), (0, -28.1010017173), (0, -30.301087387), align=None)
        Polygon((0, -16.8202612549), (0, -15.72021842), (-8.4182686231, -15.72021842), (0, -30.301087387), (0, -28.1010017173), (-6.5129385426, -16.8202612549), align=None)
    extrude(amount=-F5_DEPTH)


with BuildPart() as f5d:
    # F3 (on face) → F5, piece 4 (new body)
    with BuildSketch(Plane(origin=(0, 0, 0), x_dir=(1, 0, 0), z_dir=(0, 0, -1))):
        with BuildLine():
            Line((-15.1458639487, -13.9524859905), (-27.0672656117, -7.0696615313))
            ThreePointArc((-27.0672656117, -7.0696615313), (-27.0592311738, -7.5768073123), (-26.9870834272, -8.0788592001))
            ThreePointArc((-26.9870834272, -8.0788592001), (-26.962062144, -8.1905027231), (-26.9338580546, -8.3013849587))
            Line((-26.9338580546, -8.3013849587), (-15.8779147563, -14.6845367981))
            Line((-15.8779147563, -14.6845367981), (-2.7364629899, -37.4461989427))
            Line((-2.7364629899, -37.4461989427), (-2.7364629899, -50.1390180668))
            ThreePointArc((-2.7364629899, -50.1390180668), (-2.2626076246, -50.5201006984), (-1.7364629899, -50.8249526341))
            Line((-1.7364629899, -50.8249526341), (-1.7364629899, -37.1782497502))
            Line((-1.7364629899, -37.1782497502), (-15.1458639487, -13.9524859905))
        make_face()
    extrude(amount=-F5_DEPTH)


solid = Compound([f1.part, f5.part, f5b.part, f5c.part, f5d.part])
